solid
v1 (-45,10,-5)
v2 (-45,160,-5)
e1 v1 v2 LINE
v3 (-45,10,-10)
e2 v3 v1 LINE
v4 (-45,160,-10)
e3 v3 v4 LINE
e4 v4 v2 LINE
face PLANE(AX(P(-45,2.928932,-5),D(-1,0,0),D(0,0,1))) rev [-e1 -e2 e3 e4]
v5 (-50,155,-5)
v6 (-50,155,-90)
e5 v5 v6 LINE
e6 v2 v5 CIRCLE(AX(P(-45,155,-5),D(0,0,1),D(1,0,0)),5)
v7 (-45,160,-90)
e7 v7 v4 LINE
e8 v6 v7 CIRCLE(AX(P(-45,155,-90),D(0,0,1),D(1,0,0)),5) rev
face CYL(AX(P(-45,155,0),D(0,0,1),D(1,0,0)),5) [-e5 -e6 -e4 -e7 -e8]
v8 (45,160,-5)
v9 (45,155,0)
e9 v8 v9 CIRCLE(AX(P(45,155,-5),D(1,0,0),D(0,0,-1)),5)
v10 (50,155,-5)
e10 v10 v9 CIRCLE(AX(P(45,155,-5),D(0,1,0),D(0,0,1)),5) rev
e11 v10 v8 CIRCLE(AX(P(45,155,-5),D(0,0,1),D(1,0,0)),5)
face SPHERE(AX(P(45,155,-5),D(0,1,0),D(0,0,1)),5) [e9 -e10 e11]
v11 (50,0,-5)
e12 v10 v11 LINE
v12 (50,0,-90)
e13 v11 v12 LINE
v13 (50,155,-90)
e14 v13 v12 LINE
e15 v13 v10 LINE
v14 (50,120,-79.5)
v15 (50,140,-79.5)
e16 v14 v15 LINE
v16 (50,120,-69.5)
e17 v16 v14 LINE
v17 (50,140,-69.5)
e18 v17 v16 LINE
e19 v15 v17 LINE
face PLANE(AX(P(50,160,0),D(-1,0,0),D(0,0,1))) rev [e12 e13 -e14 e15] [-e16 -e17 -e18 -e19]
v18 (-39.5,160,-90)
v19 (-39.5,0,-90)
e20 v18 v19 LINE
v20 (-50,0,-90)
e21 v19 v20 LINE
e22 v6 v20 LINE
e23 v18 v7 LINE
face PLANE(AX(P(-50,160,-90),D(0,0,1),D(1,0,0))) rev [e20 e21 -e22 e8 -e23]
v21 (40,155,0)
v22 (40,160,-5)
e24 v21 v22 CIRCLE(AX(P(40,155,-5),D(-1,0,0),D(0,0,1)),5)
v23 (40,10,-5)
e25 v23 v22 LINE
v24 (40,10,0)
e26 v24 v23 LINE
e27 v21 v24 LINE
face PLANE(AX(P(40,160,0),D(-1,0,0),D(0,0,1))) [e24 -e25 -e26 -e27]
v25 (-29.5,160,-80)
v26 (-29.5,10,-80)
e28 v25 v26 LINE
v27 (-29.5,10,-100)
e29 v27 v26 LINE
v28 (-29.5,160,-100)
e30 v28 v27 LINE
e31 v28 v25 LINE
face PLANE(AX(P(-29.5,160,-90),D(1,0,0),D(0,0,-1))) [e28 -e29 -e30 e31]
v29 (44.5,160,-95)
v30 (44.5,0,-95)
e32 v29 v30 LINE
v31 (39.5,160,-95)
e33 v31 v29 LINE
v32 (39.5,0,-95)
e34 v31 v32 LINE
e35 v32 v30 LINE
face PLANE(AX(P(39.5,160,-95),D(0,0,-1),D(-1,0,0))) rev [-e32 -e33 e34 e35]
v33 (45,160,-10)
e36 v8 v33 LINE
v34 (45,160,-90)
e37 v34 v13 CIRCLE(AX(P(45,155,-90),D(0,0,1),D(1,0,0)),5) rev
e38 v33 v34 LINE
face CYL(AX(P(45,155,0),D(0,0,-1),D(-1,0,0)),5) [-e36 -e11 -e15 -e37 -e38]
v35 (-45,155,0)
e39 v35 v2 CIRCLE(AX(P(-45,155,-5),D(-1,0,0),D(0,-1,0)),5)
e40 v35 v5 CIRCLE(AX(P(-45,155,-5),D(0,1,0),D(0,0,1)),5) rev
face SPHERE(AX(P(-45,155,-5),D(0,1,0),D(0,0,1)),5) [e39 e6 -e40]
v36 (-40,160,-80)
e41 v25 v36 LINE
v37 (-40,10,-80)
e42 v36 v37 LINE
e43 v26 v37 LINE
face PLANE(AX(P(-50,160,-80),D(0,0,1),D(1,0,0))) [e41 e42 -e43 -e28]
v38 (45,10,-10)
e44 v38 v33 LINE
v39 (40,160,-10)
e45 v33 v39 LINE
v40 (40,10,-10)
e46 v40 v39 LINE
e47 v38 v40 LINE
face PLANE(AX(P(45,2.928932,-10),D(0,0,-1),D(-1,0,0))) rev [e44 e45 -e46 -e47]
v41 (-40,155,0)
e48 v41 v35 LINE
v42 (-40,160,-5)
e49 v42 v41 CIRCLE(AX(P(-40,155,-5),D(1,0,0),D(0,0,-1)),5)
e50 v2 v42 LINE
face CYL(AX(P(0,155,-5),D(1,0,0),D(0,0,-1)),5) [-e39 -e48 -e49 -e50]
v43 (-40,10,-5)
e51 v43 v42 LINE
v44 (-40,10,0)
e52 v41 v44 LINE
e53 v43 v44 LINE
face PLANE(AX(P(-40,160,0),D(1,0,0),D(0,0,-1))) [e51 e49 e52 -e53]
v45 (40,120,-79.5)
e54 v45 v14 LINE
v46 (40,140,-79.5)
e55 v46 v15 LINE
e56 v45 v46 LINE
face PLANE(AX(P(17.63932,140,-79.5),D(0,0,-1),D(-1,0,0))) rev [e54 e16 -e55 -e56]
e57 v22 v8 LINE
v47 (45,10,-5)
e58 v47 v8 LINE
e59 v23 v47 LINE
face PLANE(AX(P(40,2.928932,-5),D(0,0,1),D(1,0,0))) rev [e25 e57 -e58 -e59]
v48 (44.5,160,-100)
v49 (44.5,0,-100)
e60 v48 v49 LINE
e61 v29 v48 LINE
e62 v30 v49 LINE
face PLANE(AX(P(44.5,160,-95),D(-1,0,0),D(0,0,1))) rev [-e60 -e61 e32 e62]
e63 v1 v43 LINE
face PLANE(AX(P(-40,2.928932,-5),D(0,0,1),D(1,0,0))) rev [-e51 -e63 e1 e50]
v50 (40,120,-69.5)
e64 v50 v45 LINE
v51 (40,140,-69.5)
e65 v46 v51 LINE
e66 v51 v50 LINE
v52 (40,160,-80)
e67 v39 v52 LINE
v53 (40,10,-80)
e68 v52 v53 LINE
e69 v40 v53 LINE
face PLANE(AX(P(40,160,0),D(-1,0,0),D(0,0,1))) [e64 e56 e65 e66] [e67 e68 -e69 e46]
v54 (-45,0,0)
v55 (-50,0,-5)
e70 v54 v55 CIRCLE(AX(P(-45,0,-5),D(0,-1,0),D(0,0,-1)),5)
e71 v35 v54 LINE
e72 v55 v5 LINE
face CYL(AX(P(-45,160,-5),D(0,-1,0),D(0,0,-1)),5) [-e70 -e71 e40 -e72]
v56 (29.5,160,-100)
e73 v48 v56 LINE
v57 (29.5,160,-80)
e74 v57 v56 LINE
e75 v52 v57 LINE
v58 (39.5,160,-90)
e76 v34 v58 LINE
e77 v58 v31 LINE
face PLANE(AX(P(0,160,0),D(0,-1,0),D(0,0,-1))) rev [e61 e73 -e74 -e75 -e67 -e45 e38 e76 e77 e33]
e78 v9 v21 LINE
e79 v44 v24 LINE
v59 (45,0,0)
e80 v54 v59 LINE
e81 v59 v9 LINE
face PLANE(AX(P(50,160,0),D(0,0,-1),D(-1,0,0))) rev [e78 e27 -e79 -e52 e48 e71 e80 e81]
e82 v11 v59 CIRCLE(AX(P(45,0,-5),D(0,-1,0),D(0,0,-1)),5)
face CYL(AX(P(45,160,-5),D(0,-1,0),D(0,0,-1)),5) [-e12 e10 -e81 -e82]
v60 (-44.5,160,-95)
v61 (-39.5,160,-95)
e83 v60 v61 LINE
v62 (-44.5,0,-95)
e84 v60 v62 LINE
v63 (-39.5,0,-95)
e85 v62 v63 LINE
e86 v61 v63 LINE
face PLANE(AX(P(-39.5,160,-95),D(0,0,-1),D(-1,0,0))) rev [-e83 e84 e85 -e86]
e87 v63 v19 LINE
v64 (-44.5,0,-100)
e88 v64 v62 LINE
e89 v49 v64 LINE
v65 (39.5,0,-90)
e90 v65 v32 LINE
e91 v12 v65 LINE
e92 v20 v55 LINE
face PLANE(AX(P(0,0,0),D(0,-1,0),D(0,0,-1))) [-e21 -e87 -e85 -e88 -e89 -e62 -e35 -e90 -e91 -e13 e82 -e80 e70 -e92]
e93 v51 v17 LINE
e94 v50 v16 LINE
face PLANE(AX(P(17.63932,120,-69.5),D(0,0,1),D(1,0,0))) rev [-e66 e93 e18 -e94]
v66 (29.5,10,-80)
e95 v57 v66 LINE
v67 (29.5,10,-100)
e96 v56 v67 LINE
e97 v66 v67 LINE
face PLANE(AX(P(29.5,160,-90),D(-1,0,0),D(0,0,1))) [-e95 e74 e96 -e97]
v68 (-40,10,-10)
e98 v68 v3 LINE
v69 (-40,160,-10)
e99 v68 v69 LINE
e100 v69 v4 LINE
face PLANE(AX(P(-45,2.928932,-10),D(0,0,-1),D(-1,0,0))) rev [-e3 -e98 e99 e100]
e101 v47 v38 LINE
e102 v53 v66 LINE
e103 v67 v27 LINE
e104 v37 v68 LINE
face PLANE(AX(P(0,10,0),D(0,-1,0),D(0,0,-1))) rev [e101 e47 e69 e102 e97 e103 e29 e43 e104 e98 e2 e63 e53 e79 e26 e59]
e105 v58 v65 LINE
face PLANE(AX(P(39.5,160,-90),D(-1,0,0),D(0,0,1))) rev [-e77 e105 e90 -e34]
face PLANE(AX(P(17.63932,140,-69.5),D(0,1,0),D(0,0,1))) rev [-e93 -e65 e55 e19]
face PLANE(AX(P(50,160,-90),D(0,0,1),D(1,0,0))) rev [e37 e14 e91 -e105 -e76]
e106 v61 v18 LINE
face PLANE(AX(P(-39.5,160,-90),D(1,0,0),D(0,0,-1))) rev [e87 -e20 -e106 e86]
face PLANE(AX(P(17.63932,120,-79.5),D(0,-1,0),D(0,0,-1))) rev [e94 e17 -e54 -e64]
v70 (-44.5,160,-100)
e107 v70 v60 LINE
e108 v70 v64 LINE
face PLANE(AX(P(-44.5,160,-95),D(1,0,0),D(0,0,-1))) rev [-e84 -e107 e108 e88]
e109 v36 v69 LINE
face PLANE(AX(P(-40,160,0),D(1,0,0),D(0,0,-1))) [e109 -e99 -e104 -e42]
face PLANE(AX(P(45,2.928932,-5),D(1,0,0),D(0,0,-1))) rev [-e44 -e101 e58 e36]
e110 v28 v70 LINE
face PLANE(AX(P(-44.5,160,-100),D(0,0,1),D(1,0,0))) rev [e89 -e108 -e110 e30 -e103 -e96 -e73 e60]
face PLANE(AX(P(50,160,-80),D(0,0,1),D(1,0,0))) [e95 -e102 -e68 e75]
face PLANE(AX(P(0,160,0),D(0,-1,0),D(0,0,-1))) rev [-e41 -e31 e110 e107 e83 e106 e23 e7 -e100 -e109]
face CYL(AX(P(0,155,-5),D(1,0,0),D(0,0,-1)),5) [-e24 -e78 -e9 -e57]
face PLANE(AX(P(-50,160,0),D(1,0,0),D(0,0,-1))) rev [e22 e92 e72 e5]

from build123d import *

# Parameters (mm, degrees)
BOSS_EXTRUDE1_DEPTH = 160
SHELL1_START        = -80
SHELL1_OUTLINE_W    = 80
SHELL1_OUTLINE_H    = 150
SHELL1_DEPTH        = 80
SHELL1_START_2      = -100
SHELL1_2_OUTLINE_W  = 59
SHELL1_2_OUTLINE_H  = 150
SHELL1_2_DEPTH      = 20
SKETCH2_W           = 5
SKETCH2_H           = 5
CUT_EXTRUDE1_DEPTH  = 150
FILLET1_R           = 5
SKETCH4_W           = 10
SKETCH4_H           = 20
CUT_EXTRUDE2_DEPTH  = 10


# Read off the part's stored shape, not the designer's step: Shell1
with BuildPart() as part:
    # Sketch1 → Boss-Extrude1 (new body)
    with BuildSketch(Plane(origin=(0, 0, 0), x_dir=(1, 0, 0), z_dir=(0, 1, 0))):
        Polygon((50, 0), (-50, 0), (-50, 90), (-39.5, 90), (-39.5, 95), (-44.5, 95), (-44.5, 100), (44.5, 100), (44.5, 95), (39.5, 95), (39.5, 90), (50, 90), align=None)
    extrude(amount=BOSS_EXTRUDE1_DEPTH)

    # Shell1 outline → Shell1 (cut)
    with BuildSketch(Plane.XY.offset(SHELL1_START)):
        with Locations((0, 85)):
            Rectangle(SHELL1_OUTLINE_W, SHELL1_OUTLINE_H)
    extrude(amount=SHELL1_DEPTH, mode=Mode.SUBTRACT)

    # Shell1 2 outline → Shell1 2 (cut)
    with BuildSketch(Plane.XY.offset(SHELL1_START_2)):
        with Locations((0, 85)):
            Rectangle(SHELL1_2_OUTLINE_W, SHELL1_2_OUTLINE_H)
    extrude(amount=SHELL1_2_DEPTH, mode=Mode.SUBTRACT)

    # Sketch2 → Cut-Extrude1 (cut)
    with BuildSketch(Plane(origin=(0, 160, 0), x_dir=(1, 0, 0), z_dir=(0, 1, 0))):
        with Locations((-42.5, 7.5)):
            Rectangle(SKETCH2_W, SKETCH2_H)
        with Locations((42.5, 7.5)):
            Rectangle(SKETCH2_W, SKETCH2_H)
    extrude(amount=-CUT_EXTRUDE1_DEPTH, mode=Mode.SUBTRACT)

    # Fillet1
    fillet1_edges = [part.edges().sort_by_distance(p)[0] for p in [
        (45, 160, 0),
        (-45, 160, 0),
        (50, 160, -45),
        (-50, 160, -45),
        (50, 80, 0),
        (-50, 80, 0),
    ]]
    fillet(fillet1_edges, radius=FILLET1_R - 0.0001)  # a hair under: the kernel refuses the full size

    # Sketch4 → Cut-Extrude2 (cut)
    with BuildSketch(Plane(origin=(50, 0, 0), x_dir=(0, 0, -1), z_dir=(1, 0, 0))):
        with Locations((74.5, 130)):
            Rectangle(SKETCH4_W, SKETCH4_H)
    extrude(amount=-CUT_EXTRUDE2_DEPTH, mode=Mode.SUBTRACT)


solid = part.part
